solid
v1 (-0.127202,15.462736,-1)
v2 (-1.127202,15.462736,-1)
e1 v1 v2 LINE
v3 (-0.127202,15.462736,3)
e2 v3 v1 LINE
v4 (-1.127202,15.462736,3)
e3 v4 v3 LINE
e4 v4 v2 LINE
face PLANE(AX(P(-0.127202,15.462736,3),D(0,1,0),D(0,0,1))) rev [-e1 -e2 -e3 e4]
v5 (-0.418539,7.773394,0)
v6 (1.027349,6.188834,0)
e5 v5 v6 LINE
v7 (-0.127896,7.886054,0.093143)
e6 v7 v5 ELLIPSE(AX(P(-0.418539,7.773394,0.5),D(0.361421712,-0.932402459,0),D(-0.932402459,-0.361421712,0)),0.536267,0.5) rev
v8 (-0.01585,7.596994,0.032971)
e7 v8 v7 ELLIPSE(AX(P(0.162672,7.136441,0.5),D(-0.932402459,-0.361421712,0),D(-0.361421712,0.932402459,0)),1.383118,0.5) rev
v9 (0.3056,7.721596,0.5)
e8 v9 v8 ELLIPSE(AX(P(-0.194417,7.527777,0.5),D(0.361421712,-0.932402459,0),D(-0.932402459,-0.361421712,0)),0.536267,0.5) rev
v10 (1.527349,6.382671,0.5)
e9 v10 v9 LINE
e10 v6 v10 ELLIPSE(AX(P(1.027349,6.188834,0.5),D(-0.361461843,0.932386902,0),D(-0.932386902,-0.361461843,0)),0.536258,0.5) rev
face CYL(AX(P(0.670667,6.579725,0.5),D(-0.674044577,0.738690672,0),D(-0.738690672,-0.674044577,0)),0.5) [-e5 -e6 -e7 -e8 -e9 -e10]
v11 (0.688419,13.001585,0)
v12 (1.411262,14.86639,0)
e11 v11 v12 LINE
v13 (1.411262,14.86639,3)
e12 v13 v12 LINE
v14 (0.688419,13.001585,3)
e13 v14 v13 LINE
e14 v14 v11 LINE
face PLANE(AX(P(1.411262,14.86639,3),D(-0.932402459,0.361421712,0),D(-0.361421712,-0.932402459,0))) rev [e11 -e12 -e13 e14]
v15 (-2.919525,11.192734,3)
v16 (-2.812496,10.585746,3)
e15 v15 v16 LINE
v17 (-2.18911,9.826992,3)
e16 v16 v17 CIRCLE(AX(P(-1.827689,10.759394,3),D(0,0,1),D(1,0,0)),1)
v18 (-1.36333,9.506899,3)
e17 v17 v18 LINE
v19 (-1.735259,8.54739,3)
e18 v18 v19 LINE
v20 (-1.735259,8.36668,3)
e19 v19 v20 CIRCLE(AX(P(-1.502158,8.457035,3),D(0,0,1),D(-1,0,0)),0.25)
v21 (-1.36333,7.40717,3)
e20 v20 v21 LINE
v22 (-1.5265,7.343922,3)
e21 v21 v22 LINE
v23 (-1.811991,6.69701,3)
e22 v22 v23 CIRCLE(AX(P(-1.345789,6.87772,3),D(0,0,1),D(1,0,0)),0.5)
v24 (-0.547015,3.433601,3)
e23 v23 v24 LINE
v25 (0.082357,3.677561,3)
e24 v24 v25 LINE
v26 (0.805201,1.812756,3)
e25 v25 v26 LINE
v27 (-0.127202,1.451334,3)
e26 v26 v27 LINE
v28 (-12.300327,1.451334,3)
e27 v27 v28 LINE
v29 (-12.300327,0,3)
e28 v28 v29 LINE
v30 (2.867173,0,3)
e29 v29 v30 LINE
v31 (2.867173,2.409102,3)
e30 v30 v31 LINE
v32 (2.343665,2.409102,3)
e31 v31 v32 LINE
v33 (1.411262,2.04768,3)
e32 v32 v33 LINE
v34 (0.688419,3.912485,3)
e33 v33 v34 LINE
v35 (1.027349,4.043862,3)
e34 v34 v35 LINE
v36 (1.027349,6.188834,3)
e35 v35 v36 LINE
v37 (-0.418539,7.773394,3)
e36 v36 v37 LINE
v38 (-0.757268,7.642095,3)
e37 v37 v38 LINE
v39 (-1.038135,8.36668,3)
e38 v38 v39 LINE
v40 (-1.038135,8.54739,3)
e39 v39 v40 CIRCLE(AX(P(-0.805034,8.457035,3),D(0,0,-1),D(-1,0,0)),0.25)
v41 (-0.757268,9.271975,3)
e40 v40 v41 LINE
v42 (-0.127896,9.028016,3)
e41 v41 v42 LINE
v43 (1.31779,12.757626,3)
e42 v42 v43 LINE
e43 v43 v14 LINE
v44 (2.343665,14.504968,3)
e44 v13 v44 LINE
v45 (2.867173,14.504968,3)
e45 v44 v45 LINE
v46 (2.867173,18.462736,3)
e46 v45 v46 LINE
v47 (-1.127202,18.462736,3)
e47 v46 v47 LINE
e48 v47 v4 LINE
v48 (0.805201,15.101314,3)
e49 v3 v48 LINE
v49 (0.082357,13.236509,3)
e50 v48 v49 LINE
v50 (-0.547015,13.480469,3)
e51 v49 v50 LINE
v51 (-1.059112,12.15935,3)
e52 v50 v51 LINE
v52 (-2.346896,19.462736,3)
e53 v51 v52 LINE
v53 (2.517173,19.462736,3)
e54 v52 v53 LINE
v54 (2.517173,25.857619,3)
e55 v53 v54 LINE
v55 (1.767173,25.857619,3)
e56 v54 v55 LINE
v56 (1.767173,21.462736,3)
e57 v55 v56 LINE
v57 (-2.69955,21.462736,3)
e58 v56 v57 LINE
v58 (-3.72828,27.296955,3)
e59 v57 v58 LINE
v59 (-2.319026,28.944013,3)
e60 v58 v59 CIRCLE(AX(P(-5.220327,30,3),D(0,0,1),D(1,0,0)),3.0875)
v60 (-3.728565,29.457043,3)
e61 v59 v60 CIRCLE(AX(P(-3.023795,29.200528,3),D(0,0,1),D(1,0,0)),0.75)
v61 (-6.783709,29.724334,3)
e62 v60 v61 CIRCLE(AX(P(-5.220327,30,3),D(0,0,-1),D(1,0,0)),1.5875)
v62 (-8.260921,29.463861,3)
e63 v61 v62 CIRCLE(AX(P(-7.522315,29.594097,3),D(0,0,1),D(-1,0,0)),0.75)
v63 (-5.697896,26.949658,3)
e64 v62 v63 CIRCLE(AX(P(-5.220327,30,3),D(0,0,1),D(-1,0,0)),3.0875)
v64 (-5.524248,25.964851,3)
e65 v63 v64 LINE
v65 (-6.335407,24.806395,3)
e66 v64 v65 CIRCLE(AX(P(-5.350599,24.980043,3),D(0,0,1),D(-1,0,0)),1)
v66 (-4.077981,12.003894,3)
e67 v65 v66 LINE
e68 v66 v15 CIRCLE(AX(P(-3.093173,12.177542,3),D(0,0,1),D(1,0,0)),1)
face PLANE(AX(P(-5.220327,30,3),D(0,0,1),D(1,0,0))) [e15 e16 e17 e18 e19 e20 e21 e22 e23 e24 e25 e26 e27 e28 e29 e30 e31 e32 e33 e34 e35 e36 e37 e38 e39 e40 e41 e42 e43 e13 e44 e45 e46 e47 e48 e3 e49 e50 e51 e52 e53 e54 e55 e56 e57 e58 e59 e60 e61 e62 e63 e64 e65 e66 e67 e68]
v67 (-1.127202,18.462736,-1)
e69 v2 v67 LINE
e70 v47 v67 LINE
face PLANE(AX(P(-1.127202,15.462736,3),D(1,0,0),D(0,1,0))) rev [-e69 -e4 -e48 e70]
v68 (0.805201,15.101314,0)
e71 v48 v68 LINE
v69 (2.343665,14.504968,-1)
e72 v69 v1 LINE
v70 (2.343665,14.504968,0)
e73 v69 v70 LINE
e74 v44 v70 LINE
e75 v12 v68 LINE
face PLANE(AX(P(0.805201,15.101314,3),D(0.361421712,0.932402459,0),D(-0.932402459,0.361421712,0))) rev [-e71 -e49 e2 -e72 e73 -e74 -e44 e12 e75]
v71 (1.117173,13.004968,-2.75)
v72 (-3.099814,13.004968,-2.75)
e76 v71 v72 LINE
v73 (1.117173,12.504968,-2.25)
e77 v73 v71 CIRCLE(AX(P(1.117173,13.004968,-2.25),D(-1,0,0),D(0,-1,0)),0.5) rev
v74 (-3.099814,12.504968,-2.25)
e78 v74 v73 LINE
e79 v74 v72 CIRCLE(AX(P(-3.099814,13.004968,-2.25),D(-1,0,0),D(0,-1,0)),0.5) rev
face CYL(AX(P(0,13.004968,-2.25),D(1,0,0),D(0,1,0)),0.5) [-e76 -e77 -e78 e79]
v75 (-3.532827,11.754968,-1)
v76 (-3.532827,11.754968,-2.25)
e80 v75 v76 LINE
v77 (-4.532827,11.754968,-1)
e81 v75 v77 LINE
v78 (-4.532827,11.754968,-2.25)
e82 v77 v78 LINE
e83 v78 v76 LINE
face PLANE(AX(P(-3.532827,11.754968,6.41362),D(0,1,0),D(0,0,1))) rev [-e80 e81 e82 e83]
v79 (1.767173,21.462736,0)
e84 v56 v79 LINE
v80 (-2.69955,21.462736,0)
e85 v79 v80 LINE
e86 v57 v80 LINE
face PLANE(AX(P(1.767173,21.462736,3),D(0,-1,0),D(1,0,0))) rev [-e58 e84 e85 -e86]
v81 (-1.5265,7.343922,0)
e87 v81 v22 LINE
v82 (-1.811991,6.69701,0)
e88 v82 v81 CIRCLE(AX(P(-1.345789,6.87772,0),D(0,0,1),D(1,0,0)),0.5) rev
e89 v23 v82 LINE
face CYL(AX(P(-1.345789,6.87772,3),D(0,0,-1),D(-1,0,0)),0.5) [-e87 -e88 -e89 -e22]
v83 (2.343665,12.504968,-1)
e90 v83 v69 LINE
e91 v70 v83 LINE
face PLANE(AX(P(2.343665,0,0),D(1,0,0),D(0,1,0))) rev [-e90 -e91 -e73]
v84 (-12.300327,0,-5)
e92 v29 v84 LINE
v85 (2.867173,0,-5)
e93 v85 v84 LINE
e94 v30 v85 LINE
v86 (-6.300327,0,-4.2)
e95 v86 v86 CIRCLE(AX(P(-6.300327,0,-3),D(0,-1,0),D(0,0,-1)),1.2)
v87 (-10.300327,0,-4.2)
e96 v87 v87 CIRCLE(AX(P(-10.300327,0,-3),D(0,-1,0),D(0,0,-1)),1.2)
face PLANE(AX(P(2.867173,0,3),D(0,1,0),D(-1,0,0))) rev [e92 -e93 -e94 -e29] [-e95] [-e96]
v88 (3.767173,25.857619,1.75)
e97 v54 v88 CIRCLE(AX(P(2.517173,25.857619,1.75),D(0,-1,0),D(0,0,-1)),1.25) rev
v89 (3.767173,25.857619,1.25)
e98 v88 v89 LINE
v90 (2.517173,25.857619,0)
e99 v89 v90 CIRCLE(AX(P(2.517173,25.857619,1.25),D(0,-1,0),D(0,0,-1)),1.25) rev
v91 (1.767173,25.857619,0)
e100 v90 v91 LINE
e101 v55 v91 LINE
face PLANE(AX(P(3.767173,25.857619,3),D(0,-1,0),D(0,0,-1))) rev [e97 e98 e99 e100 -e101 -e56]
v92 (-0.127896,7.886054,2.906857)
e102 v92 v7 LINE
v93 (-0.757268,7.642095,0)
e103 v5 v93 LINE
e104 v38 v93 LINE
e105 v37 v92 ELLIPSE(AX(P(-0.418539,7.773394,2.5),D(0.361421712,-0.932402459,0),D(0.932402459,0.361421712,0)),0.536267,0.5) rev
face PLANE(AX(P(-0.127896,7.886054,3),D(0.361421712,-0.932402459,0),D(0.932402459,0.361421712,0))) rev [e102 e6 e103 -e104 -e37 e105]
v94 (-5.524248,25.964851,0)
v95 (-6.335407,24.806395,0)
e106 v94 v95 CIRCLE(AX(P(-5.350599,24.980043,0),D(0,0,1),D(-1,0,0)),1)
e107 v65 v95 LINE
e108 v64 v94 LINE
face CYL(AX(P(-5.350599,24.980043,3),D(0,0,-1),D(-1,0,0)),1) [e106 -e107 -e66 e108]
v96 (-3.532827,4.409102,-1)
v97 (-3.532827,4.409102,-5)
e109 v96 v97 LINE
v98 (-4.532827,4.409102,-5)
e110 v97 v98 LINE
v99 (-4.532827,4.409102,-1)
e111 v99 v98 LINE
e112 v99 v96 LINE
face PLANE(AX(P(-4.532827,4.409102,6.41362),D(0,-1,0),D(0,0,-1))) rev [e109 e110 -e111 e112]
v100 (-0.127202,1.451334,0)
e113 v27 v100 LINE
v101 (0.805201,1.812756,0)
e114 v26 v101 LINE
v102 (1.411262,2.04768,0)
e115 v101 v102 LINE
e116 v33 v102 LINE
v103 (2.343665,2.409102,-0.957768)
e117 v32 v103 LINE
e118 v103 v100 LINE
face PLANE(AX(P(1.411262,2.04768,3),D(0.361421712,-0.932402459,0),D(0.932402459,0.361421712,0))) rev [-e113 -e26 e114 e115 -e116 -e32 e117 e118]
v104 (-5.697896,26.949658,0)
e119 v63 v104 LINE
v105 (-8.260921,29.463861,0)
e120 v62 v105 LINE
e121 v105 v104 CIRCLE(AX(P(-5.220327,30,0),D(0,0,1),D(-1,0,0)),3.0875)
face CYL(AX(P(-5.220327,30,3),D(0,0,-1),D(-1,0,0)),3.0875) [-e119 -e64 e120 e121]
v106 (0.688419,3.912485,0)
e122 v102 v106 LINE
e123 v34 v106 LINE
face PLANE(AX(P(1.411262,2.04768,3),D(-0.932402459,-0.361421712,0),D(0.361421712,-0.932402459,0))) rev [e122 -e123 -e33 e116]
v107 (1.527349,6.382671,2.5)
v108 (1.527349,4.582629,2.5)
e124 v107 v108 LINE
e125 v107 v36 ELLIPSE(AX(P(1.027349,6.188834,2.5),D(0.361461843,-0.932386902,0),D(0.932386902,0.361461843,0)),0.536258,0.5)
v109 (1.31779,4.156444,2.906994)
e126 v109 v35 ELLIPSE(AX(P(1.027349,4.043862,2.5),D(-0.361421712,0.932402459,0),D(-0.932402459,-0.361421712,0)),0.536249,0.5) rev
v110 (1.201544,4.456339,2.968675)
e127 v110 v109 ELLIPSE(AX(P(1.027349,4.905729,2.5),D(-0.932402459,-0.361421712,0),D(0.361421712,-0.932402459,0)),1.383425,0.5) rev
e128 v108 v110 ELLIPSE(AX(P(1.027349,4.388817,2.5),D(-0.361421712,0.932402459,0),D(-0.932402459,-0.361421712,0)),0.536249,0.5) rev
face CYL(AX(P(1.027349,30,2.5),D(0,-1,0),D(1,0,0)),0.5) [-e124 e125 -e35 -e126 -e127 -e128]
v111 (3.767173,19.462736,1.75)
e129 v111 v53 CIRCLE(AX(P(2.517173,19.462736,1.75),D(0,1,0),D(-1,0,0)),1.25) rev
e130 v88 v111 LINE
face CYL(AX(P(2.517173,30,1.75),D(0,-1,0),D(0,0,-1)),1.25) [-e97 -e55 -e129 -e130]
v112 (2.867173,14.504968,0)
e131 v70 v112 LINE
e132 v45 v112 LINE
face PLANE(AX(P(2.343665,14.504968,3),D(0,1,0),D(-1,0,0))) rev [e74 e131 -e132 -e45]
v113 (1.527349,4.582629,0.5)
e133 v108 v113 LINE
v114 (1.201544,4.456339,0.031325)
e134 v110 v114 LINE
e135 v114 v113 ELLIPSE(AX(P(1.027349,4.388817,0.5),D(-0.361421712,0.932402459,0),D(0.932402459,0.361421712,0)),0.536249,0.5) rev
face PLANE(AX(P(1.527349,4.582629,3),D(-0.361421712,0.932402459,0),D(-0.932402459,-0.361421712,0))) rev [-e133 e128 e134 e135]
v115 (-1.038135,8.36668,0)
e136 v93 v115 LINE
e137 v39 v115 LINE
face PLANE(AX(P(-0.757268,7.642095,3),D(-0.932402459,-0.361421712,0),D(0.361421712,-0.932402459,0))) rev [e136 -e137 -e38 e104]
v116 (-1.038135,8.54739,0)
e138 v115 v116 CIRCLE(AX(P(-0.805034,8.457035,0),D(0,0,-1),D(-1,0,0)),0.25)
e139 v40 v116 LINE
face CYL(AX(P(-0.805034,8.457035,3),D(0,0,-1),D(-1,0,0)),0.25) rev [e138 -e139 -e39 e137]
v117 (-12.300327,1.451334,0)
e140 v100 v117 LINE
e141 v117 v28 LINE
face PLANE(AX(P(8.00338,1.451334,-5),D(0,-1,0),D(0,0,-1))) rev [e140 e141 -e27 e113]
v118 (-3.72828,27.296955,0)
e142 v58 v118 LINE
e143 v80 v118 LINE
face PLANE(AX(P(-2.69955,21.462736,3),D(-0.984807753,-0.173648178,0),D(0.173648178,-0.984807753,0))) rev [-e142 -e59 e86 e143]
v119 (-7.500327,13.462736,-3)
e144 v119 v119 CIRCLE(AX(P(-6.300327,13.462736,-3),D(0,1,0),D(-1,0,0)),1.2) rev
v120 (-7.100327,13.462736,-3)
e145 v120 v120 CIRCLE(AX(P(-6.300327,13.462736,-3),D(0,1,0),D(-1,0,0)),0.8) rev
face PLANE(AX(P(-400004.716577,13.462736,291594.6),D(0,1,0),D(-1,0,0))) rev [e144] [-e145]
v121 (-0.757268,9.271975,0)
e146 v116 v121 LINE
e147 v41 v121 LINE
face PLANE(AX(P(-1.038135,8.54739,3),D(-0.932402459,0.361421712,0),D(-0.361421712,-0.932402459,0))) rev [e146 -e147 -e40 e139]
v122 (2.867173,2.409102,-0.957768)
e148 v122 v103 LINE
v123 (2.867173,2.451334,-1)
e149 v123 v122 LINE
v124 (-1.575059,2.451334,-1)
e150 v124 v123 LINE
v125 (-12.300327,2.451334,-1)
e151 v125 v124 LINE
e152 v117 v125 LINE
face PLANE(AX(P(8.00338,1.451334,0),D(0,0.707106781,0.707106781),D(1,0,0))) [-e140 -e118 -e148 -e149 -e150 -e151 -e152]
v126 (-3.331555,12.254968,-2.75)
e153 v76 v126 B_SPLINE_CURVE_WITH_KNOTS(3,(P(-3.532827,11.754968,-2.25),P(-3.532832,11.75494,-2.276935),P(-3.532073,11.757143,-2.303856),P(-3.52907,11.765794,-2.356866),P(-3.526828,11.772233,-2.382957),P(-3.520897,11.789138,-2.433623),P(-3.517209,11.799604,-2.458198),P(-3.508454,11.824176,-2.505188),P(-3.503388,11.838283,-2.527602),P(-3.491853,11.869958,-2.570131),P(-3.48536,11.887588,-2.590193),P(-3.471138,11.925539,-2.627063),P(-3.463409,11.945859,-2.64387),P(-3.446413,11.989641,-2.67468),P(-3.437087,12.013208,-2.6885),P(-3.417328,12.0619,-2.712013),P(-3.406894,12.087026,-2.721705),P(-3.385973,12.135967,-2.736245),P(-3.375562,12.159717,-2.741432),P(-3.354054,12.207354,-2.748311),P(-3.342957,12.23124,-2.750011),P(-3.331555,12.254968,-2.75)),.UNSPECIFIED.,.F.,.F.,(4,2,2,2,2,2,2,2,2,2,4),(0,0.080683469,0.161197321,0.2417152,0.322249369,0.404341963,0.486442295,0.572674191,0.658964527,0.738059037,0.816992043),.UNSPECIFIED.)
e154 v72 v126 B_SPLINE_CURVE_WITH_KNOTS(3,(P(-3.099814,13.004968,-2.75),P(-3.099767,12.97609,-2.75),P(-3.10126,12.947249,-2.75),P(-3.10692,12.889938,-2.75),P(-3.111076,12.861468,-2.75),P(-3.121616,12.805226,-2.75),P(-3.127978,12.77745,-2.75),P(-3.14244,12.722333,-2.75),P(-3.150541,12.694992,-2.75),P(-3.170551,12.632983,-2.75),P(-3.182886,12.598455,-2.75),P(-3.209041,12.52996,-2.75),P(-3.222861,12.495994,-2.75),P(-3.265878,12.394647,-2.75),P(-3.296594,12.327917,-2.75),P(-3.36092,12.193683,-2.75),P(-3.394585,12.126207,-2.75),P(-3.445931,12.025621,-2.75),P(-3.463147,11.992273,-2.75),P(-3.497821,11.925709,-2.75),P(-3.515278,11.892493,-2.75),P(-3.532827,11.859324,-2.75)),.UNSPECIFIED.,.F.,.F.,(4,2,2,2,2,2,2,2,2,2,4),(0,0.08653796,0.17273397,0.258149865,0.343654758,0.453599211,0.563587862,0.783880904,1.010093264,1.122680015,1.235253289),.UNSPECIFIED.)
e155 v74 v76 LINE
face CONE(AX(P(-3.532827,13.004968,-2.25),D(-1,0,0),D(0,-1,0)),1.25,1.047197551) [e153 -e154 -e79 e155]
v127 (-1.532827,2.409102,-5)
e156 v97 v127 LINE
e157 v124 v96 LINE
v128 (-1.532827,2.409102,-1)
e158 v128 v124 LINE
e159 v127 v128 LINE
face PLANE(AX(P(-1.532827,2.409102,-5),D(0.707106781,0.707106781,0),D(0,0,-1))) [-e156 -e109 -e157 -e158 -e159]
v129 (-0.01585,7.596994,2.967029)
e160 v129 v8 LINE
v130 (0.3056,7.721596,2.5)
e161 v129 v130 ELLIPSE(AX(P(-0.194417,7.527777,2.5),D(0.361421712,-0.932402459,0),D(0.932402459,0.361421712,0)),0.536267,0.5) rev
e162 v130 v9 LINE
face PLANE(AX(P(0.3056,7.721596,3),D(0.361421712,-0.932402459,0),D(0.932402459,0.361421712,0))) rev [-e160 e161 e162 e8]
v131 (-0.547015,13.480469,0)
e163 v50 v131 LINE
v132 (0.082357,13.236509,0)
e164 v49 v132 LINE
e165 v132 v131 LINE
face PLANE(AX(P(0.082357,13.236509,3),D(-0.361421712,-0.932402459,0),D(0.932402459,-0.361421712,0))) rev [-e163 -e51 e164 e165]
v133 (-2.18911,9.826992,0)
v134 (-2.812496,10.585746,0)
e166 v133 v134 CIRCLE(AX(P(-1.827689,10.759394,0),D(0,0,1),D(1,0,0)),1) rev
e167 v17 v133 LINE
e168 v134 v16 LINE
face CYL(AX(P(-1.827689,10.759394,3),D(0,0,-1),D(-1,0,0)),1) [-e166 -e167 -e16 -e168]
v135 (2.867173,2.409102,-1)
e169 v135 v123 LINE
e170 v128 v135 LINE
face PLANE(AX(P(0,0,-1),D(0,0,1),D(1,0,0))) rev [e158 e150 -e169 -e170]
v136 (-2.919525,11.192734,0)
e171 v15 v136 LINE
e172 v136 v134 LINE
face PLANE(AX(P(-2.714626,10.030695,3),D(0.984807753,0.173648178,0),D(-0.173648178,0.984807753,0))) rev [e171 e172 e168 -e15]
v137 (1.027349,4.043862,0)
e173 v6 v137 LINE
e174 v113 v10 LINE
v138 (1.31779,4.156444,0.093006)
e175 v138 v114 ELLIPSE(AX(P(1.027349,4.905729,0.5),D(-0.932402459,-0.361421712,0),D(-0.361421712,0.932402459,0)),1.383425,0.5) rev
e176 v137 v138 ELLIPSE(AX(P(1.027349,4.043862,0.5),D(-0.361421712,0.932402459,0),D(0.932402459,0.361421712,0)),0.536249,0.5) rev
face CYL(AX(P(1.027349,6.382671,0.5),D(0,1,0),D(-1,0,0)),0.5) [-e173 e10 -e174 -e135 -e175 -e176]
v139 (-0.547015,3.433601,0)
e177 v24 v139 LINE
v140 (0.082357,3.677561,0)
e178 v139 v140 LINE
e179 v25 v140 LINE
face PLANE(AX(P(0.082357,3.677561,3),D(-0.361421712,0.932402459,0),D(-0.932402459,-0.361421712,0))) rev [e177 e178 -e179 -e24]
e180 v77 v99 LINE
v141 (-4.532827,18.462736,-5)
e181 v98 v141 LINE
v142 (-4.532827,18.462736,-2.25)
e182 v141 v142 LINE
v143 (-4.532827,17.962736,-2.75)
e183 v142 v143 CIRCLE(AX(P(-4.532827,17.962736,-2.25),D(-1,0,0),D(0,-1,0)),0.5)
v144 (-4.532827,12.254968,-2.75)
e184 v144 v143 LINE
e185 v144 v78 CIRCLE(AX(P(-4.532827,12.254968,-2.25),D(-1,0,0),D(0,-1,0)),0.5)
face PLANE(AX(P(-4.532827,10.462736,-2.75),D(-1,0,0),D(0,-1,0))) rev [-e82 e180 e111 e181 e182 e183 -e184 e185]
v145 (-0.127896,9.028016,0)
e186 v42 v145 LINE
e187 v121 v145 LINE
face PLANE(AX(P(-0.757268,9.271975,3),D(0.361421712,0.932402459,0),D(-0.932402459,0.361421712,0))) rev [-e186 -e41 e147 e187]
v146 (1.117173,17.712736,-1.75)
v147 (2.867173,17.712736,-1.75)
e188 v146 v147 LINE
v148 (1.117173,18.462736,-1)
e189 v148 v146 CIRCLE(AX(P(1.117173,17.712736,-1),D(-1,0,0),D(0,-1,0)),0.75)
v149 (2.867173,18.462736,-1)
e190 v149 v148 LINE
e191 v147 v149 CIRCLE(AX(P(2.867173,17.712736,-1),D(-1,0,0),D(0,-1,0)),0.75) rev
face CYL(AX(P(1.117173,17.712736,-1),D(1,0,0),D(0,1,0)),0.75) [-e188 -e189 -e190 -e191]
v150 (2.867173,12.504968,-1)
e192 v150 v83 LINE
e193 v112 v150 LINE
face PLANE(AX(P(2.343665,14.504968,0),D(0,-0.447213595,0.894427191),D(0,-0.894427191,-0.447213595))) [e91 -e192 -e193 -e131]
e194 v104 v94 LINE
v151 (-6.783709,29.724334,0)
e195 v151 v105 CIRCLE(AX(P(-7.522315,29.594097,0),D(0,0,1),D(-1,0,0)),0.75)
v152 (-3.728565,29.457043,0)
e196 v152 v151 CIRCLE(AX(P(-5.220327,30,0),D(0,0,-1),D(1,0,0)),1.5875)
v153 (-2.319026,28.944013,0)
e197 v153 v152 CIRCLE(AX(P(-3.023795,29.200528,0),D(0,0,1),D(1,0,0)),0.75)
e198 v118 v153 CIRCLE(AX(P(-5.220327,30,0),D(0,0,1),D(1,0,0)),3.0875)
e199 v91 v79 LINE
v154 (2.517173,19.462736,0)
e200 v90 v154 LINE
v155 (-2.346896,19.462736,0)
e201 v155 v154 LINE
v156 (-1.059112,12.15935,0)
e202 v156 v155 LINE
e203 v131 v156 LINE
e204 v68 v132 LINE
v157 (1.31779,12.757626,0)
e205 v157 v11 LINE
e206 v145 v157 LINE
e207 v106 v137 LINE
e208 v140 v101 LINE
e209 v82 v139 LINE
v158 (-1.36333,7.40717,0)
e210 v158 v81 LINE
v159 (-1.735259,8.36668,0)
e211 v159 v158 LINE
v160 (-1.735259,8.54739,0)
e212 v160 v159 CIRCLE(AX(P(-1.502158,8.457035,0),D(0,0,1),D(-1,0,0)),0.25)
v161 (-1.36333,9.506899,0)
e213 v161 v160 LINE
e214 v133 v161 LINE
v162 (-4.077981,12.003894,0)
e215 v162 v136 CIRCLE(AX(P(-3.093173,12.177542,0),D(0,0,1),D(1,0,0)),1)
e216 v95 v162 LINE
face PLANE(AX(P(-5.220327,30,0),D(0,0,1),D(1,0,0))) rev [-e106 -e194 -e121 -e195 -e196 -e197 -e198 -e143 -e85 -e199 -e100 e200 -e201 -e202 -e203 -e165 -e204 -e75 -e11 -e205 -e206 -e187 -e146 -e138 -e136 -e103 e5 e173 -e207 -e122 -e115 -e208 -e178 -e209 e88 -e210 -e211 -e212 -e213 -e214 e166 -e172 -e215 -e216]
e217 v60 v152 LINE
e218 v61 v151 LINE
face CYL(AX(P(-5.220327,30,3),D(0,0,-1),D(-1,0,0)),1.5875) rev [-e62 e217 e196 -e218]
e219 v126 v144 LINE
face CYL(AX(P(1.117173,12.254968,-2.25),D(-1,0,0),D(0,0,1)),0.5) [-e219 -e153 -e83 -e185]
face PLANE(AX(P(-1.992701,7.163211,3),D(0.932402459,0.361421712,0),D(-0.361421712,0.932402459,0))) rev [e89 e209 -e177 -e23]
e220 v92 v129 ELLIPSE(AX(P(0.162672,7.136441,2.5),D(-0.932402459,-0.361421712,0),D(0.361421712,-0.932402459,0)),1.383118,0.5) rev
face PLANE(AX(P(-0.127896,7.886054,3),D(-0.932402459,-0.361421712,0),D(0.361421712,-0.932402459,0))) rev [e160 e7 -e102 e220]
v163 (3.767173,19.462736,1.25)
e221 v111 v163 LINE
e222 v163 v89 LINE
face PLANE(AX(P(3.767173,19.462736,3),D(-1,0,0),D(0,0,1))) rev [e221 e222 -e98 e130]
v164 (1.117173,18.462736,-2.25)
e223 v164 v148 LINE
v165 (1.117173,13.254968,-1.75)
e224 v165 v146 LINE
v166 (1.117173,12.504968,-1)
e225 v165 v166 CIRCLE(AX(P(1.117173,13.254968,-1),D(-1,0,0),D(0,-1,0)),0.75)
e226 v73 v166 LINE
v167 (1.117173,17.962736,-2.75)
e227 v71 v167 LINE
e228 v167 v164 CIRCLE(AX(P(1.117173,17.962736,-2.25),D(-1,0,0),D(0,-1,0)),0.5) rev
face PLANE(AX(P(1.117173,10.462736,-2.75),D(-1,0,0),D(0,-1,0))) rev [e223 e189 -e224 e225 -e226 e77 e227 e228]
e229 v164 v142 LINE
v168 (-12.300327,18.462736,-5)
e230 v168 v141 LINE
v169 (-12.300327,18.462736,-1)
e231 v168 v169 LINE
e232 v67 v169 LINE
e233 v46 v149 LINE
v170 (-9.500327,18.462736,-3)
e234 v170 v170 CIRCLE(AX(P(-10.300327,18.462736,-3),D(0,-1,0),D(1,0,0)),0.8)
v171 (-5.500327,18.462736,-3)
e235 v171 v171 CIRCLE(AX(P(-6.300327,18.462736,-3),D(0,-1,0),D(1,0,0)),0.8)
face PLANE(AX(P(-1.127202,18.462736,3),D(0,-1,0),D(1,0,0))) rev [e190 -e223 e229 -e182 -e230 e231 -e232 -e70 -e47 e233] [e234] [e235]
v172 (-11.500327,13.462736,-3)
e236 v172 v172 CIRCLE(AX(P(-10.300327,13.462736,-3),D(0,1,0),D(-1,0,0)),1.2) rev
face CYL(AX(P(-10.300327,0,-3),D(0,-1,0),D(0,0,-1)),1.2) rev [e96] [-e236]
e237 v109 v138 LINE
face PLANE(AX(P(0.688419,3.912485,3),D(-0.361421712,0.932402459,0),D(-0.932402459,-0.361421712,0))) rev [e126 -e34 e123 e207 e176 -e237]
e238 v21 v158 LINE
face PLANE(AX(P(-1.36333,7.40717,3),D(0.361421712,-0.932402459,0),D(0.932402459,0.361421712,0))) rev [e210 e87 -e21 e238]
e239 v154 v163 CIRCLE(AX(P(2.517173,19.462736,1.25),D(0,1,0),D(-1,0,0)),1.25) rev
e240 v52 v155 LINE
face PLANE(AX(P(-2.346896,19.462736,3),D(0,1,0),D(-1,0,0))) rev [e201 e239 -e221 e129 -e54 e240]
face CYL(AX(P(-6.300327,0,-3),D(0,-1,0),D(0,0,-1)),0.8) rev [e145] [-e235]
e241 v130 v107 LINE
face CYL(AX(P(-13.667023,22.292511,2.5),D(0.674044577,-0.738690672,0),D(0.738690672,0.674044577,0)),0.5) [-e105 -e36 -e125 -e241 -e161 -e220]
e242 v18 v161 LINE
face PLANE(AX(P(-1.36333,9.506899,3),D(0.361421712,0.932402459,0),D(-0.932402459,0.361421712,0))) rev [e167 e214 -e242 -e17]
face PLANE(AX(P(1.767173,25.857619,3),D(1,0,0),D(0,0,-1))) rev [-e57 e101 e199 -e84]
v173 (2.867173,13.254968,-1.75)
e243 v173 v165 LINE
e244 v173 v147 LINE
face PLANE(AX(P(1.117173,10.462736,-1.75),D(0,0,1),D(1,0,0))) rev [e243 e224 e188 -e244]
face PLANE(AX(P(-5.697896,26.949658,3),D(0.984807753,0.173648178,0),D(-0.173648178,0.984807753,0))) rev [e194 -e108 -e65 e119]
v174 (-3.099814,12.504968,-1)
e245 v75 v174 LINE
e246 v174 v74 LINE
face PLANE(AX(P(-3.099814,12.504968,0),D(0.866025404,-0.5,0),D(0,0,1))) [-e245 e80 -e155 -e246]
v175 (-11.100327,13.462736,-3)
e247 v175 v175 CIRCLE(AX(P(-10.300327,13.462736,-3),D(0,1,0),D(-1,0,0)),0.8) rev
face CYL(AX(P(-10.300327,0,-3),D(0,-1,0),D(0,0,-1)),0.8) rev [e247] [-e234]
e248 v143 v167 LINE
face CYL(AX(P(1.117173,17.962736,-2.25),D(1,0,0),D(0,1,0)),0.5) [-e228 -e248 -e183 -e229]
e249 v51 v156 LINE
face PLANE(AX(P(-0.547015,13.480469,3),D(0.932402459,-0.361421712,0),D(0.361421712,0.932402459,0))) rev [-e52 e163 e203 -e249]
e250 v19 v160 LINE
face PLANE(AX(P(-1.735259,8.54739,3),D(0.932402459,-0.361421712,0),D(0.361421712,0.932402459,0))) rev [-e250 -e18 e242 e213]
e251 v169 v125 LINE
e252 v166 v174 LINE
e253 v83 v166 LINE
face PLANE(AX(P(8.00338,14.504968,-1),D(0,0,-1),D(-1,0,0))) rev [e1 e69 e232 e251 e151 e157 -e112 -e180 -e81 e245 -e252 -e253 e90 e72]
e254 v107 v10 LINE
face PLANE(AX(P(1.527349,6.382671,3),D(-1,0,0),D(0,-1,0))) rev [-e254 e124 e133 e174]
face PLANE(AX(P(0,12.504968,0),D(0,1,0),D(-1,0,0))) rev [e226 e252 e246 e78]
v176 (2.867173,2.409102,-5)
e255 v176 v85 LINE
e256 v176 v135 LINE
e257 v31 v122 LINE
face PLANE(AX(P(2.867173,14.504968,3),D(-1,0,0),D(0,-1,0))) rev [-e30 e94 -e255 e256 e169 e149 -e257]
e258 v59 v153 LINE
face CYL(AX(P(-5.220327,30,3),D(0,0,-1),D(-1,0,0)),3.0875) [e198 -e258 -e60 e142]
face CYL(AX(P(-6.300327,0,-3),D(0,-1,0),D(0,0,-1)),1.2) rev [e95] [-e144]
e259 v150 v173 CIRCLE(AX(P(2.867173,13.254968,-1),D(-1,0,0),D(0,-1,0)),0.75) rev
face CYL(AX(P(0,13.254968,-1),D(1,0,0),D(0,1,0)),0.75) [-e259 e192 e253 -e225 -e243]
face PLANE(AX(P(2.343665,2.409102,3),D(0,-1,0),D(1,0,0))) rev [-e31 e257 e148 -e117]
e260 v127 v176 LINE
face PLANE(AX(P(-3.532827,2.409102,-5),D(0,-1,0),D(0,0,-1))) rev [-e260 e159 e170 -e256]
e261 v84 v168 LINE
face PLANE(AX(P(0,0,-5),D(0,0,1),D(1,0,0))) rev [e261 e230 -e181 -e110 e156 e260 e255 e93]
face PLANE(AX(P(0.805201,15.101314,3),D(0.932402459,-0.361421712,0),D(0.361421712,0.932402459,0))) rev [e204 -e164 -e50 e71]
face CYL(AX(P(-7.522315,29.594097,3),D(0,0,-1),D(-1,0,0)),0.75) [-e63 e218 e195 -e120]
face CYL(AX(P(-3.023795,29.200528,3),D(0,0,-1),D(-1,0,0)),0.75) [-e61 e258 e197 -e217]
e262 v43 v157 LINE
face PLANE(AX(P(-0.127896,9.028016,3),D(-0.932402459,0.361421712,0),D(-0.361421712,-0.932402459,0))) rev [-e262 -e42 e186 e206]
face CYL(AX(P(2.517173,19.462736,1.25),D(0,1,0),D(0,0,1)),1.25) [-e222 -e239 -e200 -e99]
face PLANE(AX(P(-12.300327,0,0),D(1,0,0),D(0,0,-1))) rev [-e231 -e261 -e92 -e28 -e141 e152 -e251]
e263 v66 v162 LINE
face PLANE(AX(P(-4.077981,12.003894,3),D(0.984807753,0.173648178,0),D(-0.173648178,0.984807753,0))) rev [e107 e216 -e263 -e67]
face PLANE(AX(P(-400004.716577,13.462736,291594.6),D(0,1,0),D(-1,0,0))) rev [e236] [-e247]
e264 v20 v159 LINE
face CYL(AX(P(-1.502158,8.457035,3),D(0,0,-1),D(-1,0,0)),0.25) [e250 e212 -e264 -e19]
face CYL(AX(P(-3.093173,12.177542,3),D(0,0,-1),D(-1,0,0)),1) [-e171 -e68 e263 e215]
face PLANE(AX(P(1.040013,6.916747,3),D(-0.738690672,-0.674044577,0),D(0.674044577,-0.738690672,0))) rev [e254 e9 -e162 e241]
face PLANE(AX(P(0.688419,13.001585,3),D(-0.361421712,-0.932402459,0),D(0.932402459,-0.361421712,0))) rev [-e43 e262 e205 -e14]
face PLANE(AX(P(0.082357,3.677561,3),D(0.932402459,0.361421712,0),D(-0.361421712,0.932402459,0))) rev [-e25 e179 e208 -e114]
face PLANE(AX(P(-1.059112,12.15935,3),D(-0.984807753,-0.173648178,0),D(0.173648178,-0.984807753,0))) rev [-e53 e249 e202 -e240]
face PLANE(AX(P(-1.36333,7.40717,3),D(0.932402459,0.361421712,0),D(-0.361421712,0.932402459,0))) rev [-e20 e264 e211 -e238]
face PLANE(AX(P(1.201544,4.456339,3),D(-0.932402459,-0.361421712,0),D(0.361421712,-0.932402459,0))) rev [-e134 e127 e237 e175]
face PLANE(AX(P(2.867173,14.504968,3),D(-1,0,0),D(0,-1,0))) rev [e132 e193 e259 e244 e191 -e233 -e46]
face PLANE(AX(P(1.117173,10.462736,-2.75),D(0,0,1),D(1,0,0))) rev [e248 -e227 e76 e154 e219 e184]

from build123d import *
from OCP.BRepFilletAPI import BRepFilletAPI_MakeChamfer

# Parameters (mm, degrees)
BOSS_SWITCH_BODY_DEPTH                    = 3
SKETCH1_W                                 = 2.994375291
SKETCH1_H                                 = 2.409101515
SKETCH1_W_2                               = 3.994375291
SKETCH1_H_2                               = 3.957767538
BOSS_FLANGE_WIDTH_DEPTH                   = 5
BOSS_FLANGE_HEIGHT_REACH                  = 36.698
SKETCH2_W                                 = 4
SKETCH2_H                                 = 3.957767538
SKETCH2_W_2                               = 8
SKETCH2_H_2                               = 1.451333978
SKETCH17_W                                = 15.1675
SKETCH17_H                                = 4
BOSS_FLANGE_SUPPORT_DEPTH                 = 13.053634428
CUT_WALL_GAP_DEPTH                        = 1
TAP_DRILL_FOR_M2X0_4_TAP1_D               = 1.6
M2_CLEARANCE_HOLE2_D                      = 2.4
M2_CLEARANCE_HOLE2_DEPTH                  = 13.462735941
CHAMFER_FLANGE_SUPPORT_3_SIZE             = 1
FILLET1_R                                 = 1
FILLET2_R                                 = 0.5
SKETCH28_W                                = 6.4
SKETCH28_H                                = 12.095866891
CUT_PRINT_SUPPORT_CLEARANCE_DEPTH         = 33.985789077
CUT_UP_TO_DOWN_DERAILLEUR_CLEARANCE_DEPTH = 8
FILLET3_R                                 = 0.5
FILLET5_R                                 = 1.25
BOSS_EXTRUDE2_DEPTH                       = 2
FILLET7_R                                 = 0.75
SKETCH34_W                                = 1
SKETCH34_H                                = 7.345866891
CUT_EXTRUDE1_DEPTH                        = 4
CHAMFER1_SIZE                             = 2
FILLET9_R                                 = 0.5
BOSS_SUPPORT_CHAMFER_DEPTH                = 0.523509
CHAMFER3_SIZE                             = 0.433012702
CHAMFER3_SIZE_2                           = 0.75
FILLET10_R                                = 0.5


# Some blends are built 0.0001 mm under size
with BuildPart() as part:
    # Sketch-SwitchBossUp → Boss-Switch Body (new body)
    with BuildSketch(Plane.XY):
        with BuildLine():
            Line((-5.697895702, 26.949658376), (-5.524247524, 25.964850623))
            ThreePointArc((-5.524247524, 25.964850623), (-6.169751391, 25.553619307), (-6.3354071, 24.806394693))
            Line((-6.3354071, 24.806394693), (-4.07798079, 12.003893904))
            ThreePointArc((-4.07798079, 12.003893904), (-3.666749473, 11.358390037), (-2.919524859, 11.192734328))
            Line((-2.919524859, 11.192734328), (-2.714625886, 10.030694504))
            Line((-2.714625886, 10.030694504), (-1.992701385, 9.750859132))
            Line((-1.992701385, 9.750859132), (-1.363329725, 9.506899476))
            Line((-1.363329725, 9.506899476), (-1.735258621, 8.547390389))
            ThreePointArc((-1.735258621, 8.547390389), (-1.752158006, 8.457034961), (-1.735258621, 8.366679532))
            Line((-1.735258621, 8.366679532), (-1.363329725, 7.407170445))
            Line((-1.363329725, 7.407170445), (-1.992701385, 7.163210789))
            Line((-1.992701385, 7.163210789), (-0.547014535, 3.433600952))
            Line((-0.547014535, 3.433600952), (0.082357125, 3.677560608))
            Line((0.082357125, 3.677560608), (0.805200549, 1.81275569))
            Line((0.805200549, 1.81275569), (-0.12720191, 1.451333978))
            Line((-0.12720191, 1.451333978), (-0.12720191, 0))
            Line((-0.12720191, 0), (2.867173381, 0))
            Line((2.867173381, 0), (2.867173381, 2.409101515))
            Line((2.867173381, 2.409101515), (2.343664607, 2.409101515))
            Line((2.343664607, 2.409101515), (1.411262148, 2.047679803))
            Line((1.411262148, 2.047679803), (0.688418723, 3.912484721))
            Line((0.688418723, 3.912484721), (1.317790383, 4.156444377))
            Line((1.317790383, 4.156444377), (1.20154386, 4.45633932))
            Line((1.20154386, 4.45633932), (1.527349418, 4.582629423))
            Line((1.527349418, 4.582629423), (1.527349418, 6.382671008))
            Line((1.527349418, 6.382671008), (1.040012528, 6.916747279))
            Line((1.040012528, 6.916747279), (0.305600099, 7.721595547))
            Line((0.305600099, 7.721595547), (-0.015849687, 7.596993847))
            Line((-0.015849687, 7.596993847), (-0.127896466, 7.886054214))
            Line((-0.127896466, 7.886054214), (-0.757268126, 7.642094558))
            Line((-0.757268126, 7.642094558), (-1.038134762, 8.366679532))
            ThreePointArc((-1.038134762, 8.366679532), (-1.055034148, 8.457034961), (-1.038134762, 8.547390389))
            Line((-1.038134762, 8.547390389), (-0.757268126, 9.271975363))
            Line((-0.757268126, 9.271975363), (-0.127896466, 9.028015707))
            Line((-0.127896466, 9.028015707), (1.317790383, 12.757625544))
            Line((1.317790383, 12.757625544), (0.688418723, 13.0015852))
            Line((0.688418723, 13.0015852), (1.411262148, 14.866390118))
            Line((1.411262148, 14.866390118), (2.343664607, 14.504968406))
            Line((2.343664607, 14.504968406), (2.867173381, 14.504968406))
            Line((2.867173381, 14.504968406), (2.867173381, 18.462735944))
            Line((2.867173381, 18.462735944), (-0.111637615, 18.462735944))
            Line((-0.111637615, 18.462735944), (-1.12720191, 18.462735944))
            Line((-1.12720191, 18.462735944), (-1.12720191, 15.462735944))
            Line((-1.12720191, 15.462735944), (-0.12720191, 15.462735944))
            Line((-0.12720191, 15.462735944), (0.805200549, 15.101314231))
            Line((0.805200549, 15.101314231), (0.082357125, 13.236509313))
            Line((0.082357125, 13.236509313), (-0.547014535, 13.480468969))
            Line((-0.547014535, 13.480468969), (-1.059112089, 12.159350171))
            Line((-1.059112089, 12.159350171), (-2.346896051, 19.462735944))
            Line((-2.346896051, 19.462735944), (3.767173381, 19.462735944))
            Line((3.767173381, 19.462735944), (3.767173381, 25.857619356))
            Line((3.767173381, 25.857619356), (1.767173381, 25.857619356))
            Line((1.767173381, 25.857619356), (1.767173381, 21.462735944))
            Line((1.767173381, 21.462735944), (-2.699550012, 21.462735944))
            Line((-2.699550012, 21.462735944), (-3.728280196, 27.296954732))
            ThreePointArc((-3.728280196, 27.296954732), (-2.874356585, 27.992742953), (-2.319025652, 28.944012807))
            ThreePointArc((-2.319025652, 28.944012807), (-2.76728001, 29.905297381), (-3.728564583, 29.457043022))
            ThreePointArc((-3.728564583, 29.457043022), (-5.35868636, 28.418540917), (-6.783708927, 29.724333518))
            ThreePointArc((-6.783708927, 29.724333518), (-7.652550875, 30.332703199), (-8.260920556, 29.463861251))
            ThreePointArc((-8.260920556, 29.463861251), (-7.382425549, 27.795916411), (-5.697895702, 26.949658376))
        make_face()
    extrude(amount=BOSS_SWITCH_BODY_DEPTH)

    # Sketch1 → Boss-Flange Width (add)
    with BuildSketch(Plane(origin=(0, 0, 0), x_dir=(-1, 0, 0), z_dir=(0, 0, -1))):
        with Locations((-1.369985736, 1.204550758)):
            Rectangle(SKETCH1_W, SKETCH1_H)
        with Locations((-0.869985736, 16.483852175)):
            Rectangle(SKETCH1_W_2, SKETCH1_H_2)
    extrude(amount=BOSS_FLANGE_WIDTH_DEPTH)

    # Boss-Flange Height: up to this face of the body (flat: up to its plane)
    boss_flange_height_end = Plane(part.part.faces().sort_by_distance((-0.12720191, 1.077409098, -1.438016547))[0])
    # Sketch2 → Boss-Flange Height (add, up to the picked face)
    with BuildSketch(Plane(origin=(-12.300326619, 0, 0), x_dir=(0, 0, -1), z_dir=(1, 0, 0)), mode=Mode.PRIVATE) as boss_flange_height_sk1:
        with Locations((3, 16.483852175)):
            Rectangle(SKETCH2_W, SKETCH2_H)
    boss_flange_height_tool1 = split(extrude(boss_flange_height_sk1.sketch, amount=BOSS_FLANGE_HEIGHT_REACH, mode=Mode.PRIVATE), bisect_by=boss_flange_height_end, keep=Keep.BOTH, mode=Mode.PRIVATE)
    # Sketch2 → Boss-Flange Height (add, up to the picked face)
    with BuildSketch(Plane(origin=(-12.300326619, 0, 0), x_dir=(0, 0, -1), z_dir=(1, 0, 0)), mode=Mode.PRIVATE) as boss_flange_height_sk2:
        with Locations((1, 0.725666989)):
            Rectangle(SKETCH2_W_2, SKETCH2_H_2)
    boss_flange_height_tool2 = split(extrude(boss_flange_height_sk2.sketch, amount=BOSS_FLANGE_HEIGHT_REACH, mode=Mode.PRIVATE), bisect_by=boss_flange_height_end, keep=Keep.BOTH, mode=Mode.PRIVATE)
    add(boss_flange_height_tool1.solids().sort_by(Axis((-12.300327, 16.483852, -3), (1, 0, 0)))[0])
    add(boss_flange_height_tool2.solids().sort_by(Axis((-12.300327, 0.725667, -1), (1, 0, 0)))[0])

    # Sketch17 → Boss-Flange Support (add)
    with BuildSketch(Plane.XZ.offset(-1.451333978)):
        with Locations((-4.716576619, -3)):
            Rectangle(SKETCH17_W, SKETCH17_H)
    extrude(amount=-BOSS_FLANGE_SUPPORT_DEPTH)

    # Sketch27 → Cut-Wall Gap (cut)
    with BuildSketch(Plane.XY):
        Polygon((-0.12720191, 15.462735944), (2.343664607, 14.504968406), (-1.12720191, 14.504968406), (-1.12720191, 15.462735944), align=None)
        Polygon((2.343664607, 2.409101515), (-0.12720191, 2.409101515), (-0.12720191, 1.451333978), align=None)
    extrude(amount=-CUT_WALL_GAP_DEPTH, mode=Mode.SUBTRACT)

    # Tap Drill for M2x0.4 Tap1 (through all)
    with Locations(Plane(origin=(0, 0, 0), x_dir=(-1, 0, 0), z_dir=(0, -1, 0))):
        with Locations((10.300326619, 3), (6.300326619, 3)):
            Hole(TAP_DRILL_FOR_M2X0_4_TAP1_D / 2)

    # M2 Clearance Hole2
    with Locations(Plane.XZ):
        with Locations((-10.300326619, -3), (-6.300326619, -3)):
            Hole(M2_CLEARANCE_HOLE2_D / 2, depth=M2_CLEARANCE_HOLE2_DEPTH)

    # Chamfer-Flange Support 3
    chamfer_flange_support_3_edges = [part.edges().sort_by_distance(p)[0] for p in [
        (-6.213764264, 1.451333978, -1),
    ]]
    chamfer(chamfer_flange_support_3_edges, length=CHAMFER_FLANGE_SUPPORT_3_SIZE)

    # Fillet1
    fillet1_edges = [part.edges().sort_by_distance(p)[0] for p in [
        (-2.714625886, 10.030694504, 1.5),
    ]]
    fillet(fillet1_edges, radius=FILLET1_R)

    # Fillet2
    fillet2_edges = [part.edges().sort_by_distance(p)[0] for p in [
        (-1.992701385, 7.163210789, 1.5),
    ]]
    fillet(fillet2_edges, radius=FILLET2_R)

    # Sketch28 → Cut-Print Support Clearance (cut, through all)
    with BuildSketch(Plane.XY.offset(-1)):
        with Locations((-0.332826619, 8.457034961)):
            Rectangle(SKETCH28_W, SKETCH28_H)
    extrude(amount=-CUT_PRINT_SUPPORT_CLEARANCE_DEPTH, mode=Mode.SUBTRACT)

    # Sketch12 → Cut-Up-to-Down Derailleur Clearance (cut)
    with BuildSketch(Plane(origin=(0, 18.462735944, 0), x_dir=(1, 0, 0), z_dir=(0, 1, 0))):
        Polygon((2.867173381, 5), (2.867173381, 2.75), (2.867173381, 1.75), (1.117173381, 1.75), (1.117173381, 2.75), (-4.532826619, 2.75), (-4.532826619, 5), align=None)
    extrude(amount=-CUT_UP_TO_DOWN_DERAILLEUR_CLEARANCE_DEPTH, mode=Mode.SUBTRACT)

    # Fillet3
    fillet3_edges = [part.edges().sort_by_distance(p)[0] for p in [
        (1.527349418, 5.482650215, 0),
        (1.527349418, 5.482650215, 3),
        (0.916474758, 7.052133278, 0),
        (0.916474758, 7.052133278, 3),
    ]]
    fillet(fillet3_edges, radius=FILLET3_R)

    # Fillet5
    fillet5_edges = [part.edges().sort_by_distance(p)[0] for p in [
        (3.767173381, 22.66017765, 3),
        (3.767173381, 22.66017765, 0),
    ]]
    fillet(fillet5_edges, radius=FILLET5_R)

    # Sketch32 → Boss-Extrude2 (add)
    with BuildSketch(Plane.XZ.offset(-14.504968406)):
        Polygon((-3.532826619, -2.75), (-3.532826619, -1), (2.867173381, -1), (2.867173381, -1.75), (1.117173381, -1.75), (1.117173381, -2.75), align=None)
    extrude(amount=BOSS_EXTRUDE2_DEPTH)

    # Fillet7
    fillet7_edges = [part.edges().sort_by_distance(p)[0] for p in [
        (1.992173381, 12.504968406, -1.75),
        (1.992173381, 18.462735944, -1.75),
    ]]
    fillet(fillet7_edges, radius=FILLET7_R - 0.0001)  # a hair under: the kernel refuses the full size

    # Sketch34 → Cut-Extrude1 (cut)
    with BuildSketch(Plane(origin=(0, 0, -5), x_dir=(-1, 0, 0), z_dir=(0, 0, -1))):
        with Locations((4.032826619, 8.082034961)):
            Rectangle(SKETCH34_W, SKETCH34_H)
    extrude(amount=-CUT_EXTRUDE1_DEPTH, mode=Mode.SUBTRACT)

    # Chamfer1
    # the kernel refuses this chamfer: 2 mm, written as the material it adds along each edge
    with BuildSketch(Plane(origin=(-3.532826619, 2.409101515, -1), x_dir=(-0.02749587661058627, 0.9996219169112968, 0), z_dir=(0, 0, -1))) as chamfer1_piece_1_section:
        Polygon((CHAMFER1_SIZE * 0.999621916911, CHAMFER1_SIZE * 0.0274958766106), (-CHAMFER1_SIZE * 0.0274958766106, CHAMFER1_SIZE * 0.999621916911), (0, 0), align=None)
    chamfer1_piece_1 = extrude(amount=4, mode=Mode.PRIVATE)
    chamfer1_piece_1 = split(chamfer1_piece_1, bisect_by=Plane(origin=(-2.87201831, 4.409101515, -3), z_dir=(0, -1, 0)), keep=Keep.TOP, mode=Mode.PRIVATE)
    add(chamfer1_piece_1)

    # Fillet9
    fillet9_edges = [part.edges().sort_by_distance(p)[0] for p in [
        (-1.707826619, 18.462735944, -2.75),
        (-1.207826619, 12.504968406, -2.75),
    ]]
    fillet(fillet9_edges, radius=FILLET9_R)

    # Sketch33 → Boss-Support Chamfer (add)
    with BuildSketch(Plane(origin=(2.867173381, 0, 0), x_dir=(0, 0, -1), z_dir=(1, 0, 0))):
        Polygon((1, 14.504968406), (0, 14.504968406), (1, 12.504968406), align=None)
    extrude(amount=-BOSS_SUPPORT_CHAMFER_DEPTH)

    # Chamfer3
    chamfer3_edges_1 = [part.edges().sort_by_distance(p)[0] for p in [
        (-3.532826619, 12.651415015, -2.603553391),
    ]]
    chamfer3_side_1 = [part.faces().sort_by_distance(p)[0] for p in [
        (-3.524166365, 12.651415015, -2.603553391),
    ]]
    chamfer3_edges_2 = [part.edges().sort_by_distance(p)[0] for p in [
        (-3.532826619, 12.504968406, -1.625),
    ]]
    chamfer3_side_2 = [part.faces().sort_by_distance(p)[0] for p in [
        (-3.532826619, 12.496308152, -1.625),
    ]]
    chamfer3 = BRepFilletAPI_MakeChamfer(part.part.solid().wrapped)
    for e in chamfer3_edges_1:
        chamfer3.Add(CHAMFER3_SIZE - 0.0001, CHAMFER3_SIZE_2 - 0.0001, e.wrapped, chamfer3_side_1[0].wrapped)
    for e in chamfer3_edges_2:
        chamfer3.Add(CHAMFER3_SIZE_2 - 0.0001, CHAMFER3_SIZE - 0.0001, e.wrapped, chamfer3_side_2[0].wrapped)
    add(Compound.cast(chamfer3.Shape()), mode=Mode.REPLACE)  # a hair under: the kernel refuses the full size

    # Fillet10
    # the kernel refuses this fillet: 0.5 mm, written as the material it takes off along each edge
    with BuildSketch(Plane(origin=(-2.282826619, 11.754968406, -2.75), x_dir=(0, 1, 0), z_dir=(-1, 0, 0))) as fillet10_piece_1:
        with BuildLine():
            CenterArc((FILLET10_R, -FILLET10_R), FILLET10_R, 90, 90)
            Line((0, -FILLET10_R), (0, 0))
            Line((0, 0), (FILLET10_R, 0))
        make_face()
    extrude(amount=2.25, mode=Mode.SUBTRACT)


solid = part.part
